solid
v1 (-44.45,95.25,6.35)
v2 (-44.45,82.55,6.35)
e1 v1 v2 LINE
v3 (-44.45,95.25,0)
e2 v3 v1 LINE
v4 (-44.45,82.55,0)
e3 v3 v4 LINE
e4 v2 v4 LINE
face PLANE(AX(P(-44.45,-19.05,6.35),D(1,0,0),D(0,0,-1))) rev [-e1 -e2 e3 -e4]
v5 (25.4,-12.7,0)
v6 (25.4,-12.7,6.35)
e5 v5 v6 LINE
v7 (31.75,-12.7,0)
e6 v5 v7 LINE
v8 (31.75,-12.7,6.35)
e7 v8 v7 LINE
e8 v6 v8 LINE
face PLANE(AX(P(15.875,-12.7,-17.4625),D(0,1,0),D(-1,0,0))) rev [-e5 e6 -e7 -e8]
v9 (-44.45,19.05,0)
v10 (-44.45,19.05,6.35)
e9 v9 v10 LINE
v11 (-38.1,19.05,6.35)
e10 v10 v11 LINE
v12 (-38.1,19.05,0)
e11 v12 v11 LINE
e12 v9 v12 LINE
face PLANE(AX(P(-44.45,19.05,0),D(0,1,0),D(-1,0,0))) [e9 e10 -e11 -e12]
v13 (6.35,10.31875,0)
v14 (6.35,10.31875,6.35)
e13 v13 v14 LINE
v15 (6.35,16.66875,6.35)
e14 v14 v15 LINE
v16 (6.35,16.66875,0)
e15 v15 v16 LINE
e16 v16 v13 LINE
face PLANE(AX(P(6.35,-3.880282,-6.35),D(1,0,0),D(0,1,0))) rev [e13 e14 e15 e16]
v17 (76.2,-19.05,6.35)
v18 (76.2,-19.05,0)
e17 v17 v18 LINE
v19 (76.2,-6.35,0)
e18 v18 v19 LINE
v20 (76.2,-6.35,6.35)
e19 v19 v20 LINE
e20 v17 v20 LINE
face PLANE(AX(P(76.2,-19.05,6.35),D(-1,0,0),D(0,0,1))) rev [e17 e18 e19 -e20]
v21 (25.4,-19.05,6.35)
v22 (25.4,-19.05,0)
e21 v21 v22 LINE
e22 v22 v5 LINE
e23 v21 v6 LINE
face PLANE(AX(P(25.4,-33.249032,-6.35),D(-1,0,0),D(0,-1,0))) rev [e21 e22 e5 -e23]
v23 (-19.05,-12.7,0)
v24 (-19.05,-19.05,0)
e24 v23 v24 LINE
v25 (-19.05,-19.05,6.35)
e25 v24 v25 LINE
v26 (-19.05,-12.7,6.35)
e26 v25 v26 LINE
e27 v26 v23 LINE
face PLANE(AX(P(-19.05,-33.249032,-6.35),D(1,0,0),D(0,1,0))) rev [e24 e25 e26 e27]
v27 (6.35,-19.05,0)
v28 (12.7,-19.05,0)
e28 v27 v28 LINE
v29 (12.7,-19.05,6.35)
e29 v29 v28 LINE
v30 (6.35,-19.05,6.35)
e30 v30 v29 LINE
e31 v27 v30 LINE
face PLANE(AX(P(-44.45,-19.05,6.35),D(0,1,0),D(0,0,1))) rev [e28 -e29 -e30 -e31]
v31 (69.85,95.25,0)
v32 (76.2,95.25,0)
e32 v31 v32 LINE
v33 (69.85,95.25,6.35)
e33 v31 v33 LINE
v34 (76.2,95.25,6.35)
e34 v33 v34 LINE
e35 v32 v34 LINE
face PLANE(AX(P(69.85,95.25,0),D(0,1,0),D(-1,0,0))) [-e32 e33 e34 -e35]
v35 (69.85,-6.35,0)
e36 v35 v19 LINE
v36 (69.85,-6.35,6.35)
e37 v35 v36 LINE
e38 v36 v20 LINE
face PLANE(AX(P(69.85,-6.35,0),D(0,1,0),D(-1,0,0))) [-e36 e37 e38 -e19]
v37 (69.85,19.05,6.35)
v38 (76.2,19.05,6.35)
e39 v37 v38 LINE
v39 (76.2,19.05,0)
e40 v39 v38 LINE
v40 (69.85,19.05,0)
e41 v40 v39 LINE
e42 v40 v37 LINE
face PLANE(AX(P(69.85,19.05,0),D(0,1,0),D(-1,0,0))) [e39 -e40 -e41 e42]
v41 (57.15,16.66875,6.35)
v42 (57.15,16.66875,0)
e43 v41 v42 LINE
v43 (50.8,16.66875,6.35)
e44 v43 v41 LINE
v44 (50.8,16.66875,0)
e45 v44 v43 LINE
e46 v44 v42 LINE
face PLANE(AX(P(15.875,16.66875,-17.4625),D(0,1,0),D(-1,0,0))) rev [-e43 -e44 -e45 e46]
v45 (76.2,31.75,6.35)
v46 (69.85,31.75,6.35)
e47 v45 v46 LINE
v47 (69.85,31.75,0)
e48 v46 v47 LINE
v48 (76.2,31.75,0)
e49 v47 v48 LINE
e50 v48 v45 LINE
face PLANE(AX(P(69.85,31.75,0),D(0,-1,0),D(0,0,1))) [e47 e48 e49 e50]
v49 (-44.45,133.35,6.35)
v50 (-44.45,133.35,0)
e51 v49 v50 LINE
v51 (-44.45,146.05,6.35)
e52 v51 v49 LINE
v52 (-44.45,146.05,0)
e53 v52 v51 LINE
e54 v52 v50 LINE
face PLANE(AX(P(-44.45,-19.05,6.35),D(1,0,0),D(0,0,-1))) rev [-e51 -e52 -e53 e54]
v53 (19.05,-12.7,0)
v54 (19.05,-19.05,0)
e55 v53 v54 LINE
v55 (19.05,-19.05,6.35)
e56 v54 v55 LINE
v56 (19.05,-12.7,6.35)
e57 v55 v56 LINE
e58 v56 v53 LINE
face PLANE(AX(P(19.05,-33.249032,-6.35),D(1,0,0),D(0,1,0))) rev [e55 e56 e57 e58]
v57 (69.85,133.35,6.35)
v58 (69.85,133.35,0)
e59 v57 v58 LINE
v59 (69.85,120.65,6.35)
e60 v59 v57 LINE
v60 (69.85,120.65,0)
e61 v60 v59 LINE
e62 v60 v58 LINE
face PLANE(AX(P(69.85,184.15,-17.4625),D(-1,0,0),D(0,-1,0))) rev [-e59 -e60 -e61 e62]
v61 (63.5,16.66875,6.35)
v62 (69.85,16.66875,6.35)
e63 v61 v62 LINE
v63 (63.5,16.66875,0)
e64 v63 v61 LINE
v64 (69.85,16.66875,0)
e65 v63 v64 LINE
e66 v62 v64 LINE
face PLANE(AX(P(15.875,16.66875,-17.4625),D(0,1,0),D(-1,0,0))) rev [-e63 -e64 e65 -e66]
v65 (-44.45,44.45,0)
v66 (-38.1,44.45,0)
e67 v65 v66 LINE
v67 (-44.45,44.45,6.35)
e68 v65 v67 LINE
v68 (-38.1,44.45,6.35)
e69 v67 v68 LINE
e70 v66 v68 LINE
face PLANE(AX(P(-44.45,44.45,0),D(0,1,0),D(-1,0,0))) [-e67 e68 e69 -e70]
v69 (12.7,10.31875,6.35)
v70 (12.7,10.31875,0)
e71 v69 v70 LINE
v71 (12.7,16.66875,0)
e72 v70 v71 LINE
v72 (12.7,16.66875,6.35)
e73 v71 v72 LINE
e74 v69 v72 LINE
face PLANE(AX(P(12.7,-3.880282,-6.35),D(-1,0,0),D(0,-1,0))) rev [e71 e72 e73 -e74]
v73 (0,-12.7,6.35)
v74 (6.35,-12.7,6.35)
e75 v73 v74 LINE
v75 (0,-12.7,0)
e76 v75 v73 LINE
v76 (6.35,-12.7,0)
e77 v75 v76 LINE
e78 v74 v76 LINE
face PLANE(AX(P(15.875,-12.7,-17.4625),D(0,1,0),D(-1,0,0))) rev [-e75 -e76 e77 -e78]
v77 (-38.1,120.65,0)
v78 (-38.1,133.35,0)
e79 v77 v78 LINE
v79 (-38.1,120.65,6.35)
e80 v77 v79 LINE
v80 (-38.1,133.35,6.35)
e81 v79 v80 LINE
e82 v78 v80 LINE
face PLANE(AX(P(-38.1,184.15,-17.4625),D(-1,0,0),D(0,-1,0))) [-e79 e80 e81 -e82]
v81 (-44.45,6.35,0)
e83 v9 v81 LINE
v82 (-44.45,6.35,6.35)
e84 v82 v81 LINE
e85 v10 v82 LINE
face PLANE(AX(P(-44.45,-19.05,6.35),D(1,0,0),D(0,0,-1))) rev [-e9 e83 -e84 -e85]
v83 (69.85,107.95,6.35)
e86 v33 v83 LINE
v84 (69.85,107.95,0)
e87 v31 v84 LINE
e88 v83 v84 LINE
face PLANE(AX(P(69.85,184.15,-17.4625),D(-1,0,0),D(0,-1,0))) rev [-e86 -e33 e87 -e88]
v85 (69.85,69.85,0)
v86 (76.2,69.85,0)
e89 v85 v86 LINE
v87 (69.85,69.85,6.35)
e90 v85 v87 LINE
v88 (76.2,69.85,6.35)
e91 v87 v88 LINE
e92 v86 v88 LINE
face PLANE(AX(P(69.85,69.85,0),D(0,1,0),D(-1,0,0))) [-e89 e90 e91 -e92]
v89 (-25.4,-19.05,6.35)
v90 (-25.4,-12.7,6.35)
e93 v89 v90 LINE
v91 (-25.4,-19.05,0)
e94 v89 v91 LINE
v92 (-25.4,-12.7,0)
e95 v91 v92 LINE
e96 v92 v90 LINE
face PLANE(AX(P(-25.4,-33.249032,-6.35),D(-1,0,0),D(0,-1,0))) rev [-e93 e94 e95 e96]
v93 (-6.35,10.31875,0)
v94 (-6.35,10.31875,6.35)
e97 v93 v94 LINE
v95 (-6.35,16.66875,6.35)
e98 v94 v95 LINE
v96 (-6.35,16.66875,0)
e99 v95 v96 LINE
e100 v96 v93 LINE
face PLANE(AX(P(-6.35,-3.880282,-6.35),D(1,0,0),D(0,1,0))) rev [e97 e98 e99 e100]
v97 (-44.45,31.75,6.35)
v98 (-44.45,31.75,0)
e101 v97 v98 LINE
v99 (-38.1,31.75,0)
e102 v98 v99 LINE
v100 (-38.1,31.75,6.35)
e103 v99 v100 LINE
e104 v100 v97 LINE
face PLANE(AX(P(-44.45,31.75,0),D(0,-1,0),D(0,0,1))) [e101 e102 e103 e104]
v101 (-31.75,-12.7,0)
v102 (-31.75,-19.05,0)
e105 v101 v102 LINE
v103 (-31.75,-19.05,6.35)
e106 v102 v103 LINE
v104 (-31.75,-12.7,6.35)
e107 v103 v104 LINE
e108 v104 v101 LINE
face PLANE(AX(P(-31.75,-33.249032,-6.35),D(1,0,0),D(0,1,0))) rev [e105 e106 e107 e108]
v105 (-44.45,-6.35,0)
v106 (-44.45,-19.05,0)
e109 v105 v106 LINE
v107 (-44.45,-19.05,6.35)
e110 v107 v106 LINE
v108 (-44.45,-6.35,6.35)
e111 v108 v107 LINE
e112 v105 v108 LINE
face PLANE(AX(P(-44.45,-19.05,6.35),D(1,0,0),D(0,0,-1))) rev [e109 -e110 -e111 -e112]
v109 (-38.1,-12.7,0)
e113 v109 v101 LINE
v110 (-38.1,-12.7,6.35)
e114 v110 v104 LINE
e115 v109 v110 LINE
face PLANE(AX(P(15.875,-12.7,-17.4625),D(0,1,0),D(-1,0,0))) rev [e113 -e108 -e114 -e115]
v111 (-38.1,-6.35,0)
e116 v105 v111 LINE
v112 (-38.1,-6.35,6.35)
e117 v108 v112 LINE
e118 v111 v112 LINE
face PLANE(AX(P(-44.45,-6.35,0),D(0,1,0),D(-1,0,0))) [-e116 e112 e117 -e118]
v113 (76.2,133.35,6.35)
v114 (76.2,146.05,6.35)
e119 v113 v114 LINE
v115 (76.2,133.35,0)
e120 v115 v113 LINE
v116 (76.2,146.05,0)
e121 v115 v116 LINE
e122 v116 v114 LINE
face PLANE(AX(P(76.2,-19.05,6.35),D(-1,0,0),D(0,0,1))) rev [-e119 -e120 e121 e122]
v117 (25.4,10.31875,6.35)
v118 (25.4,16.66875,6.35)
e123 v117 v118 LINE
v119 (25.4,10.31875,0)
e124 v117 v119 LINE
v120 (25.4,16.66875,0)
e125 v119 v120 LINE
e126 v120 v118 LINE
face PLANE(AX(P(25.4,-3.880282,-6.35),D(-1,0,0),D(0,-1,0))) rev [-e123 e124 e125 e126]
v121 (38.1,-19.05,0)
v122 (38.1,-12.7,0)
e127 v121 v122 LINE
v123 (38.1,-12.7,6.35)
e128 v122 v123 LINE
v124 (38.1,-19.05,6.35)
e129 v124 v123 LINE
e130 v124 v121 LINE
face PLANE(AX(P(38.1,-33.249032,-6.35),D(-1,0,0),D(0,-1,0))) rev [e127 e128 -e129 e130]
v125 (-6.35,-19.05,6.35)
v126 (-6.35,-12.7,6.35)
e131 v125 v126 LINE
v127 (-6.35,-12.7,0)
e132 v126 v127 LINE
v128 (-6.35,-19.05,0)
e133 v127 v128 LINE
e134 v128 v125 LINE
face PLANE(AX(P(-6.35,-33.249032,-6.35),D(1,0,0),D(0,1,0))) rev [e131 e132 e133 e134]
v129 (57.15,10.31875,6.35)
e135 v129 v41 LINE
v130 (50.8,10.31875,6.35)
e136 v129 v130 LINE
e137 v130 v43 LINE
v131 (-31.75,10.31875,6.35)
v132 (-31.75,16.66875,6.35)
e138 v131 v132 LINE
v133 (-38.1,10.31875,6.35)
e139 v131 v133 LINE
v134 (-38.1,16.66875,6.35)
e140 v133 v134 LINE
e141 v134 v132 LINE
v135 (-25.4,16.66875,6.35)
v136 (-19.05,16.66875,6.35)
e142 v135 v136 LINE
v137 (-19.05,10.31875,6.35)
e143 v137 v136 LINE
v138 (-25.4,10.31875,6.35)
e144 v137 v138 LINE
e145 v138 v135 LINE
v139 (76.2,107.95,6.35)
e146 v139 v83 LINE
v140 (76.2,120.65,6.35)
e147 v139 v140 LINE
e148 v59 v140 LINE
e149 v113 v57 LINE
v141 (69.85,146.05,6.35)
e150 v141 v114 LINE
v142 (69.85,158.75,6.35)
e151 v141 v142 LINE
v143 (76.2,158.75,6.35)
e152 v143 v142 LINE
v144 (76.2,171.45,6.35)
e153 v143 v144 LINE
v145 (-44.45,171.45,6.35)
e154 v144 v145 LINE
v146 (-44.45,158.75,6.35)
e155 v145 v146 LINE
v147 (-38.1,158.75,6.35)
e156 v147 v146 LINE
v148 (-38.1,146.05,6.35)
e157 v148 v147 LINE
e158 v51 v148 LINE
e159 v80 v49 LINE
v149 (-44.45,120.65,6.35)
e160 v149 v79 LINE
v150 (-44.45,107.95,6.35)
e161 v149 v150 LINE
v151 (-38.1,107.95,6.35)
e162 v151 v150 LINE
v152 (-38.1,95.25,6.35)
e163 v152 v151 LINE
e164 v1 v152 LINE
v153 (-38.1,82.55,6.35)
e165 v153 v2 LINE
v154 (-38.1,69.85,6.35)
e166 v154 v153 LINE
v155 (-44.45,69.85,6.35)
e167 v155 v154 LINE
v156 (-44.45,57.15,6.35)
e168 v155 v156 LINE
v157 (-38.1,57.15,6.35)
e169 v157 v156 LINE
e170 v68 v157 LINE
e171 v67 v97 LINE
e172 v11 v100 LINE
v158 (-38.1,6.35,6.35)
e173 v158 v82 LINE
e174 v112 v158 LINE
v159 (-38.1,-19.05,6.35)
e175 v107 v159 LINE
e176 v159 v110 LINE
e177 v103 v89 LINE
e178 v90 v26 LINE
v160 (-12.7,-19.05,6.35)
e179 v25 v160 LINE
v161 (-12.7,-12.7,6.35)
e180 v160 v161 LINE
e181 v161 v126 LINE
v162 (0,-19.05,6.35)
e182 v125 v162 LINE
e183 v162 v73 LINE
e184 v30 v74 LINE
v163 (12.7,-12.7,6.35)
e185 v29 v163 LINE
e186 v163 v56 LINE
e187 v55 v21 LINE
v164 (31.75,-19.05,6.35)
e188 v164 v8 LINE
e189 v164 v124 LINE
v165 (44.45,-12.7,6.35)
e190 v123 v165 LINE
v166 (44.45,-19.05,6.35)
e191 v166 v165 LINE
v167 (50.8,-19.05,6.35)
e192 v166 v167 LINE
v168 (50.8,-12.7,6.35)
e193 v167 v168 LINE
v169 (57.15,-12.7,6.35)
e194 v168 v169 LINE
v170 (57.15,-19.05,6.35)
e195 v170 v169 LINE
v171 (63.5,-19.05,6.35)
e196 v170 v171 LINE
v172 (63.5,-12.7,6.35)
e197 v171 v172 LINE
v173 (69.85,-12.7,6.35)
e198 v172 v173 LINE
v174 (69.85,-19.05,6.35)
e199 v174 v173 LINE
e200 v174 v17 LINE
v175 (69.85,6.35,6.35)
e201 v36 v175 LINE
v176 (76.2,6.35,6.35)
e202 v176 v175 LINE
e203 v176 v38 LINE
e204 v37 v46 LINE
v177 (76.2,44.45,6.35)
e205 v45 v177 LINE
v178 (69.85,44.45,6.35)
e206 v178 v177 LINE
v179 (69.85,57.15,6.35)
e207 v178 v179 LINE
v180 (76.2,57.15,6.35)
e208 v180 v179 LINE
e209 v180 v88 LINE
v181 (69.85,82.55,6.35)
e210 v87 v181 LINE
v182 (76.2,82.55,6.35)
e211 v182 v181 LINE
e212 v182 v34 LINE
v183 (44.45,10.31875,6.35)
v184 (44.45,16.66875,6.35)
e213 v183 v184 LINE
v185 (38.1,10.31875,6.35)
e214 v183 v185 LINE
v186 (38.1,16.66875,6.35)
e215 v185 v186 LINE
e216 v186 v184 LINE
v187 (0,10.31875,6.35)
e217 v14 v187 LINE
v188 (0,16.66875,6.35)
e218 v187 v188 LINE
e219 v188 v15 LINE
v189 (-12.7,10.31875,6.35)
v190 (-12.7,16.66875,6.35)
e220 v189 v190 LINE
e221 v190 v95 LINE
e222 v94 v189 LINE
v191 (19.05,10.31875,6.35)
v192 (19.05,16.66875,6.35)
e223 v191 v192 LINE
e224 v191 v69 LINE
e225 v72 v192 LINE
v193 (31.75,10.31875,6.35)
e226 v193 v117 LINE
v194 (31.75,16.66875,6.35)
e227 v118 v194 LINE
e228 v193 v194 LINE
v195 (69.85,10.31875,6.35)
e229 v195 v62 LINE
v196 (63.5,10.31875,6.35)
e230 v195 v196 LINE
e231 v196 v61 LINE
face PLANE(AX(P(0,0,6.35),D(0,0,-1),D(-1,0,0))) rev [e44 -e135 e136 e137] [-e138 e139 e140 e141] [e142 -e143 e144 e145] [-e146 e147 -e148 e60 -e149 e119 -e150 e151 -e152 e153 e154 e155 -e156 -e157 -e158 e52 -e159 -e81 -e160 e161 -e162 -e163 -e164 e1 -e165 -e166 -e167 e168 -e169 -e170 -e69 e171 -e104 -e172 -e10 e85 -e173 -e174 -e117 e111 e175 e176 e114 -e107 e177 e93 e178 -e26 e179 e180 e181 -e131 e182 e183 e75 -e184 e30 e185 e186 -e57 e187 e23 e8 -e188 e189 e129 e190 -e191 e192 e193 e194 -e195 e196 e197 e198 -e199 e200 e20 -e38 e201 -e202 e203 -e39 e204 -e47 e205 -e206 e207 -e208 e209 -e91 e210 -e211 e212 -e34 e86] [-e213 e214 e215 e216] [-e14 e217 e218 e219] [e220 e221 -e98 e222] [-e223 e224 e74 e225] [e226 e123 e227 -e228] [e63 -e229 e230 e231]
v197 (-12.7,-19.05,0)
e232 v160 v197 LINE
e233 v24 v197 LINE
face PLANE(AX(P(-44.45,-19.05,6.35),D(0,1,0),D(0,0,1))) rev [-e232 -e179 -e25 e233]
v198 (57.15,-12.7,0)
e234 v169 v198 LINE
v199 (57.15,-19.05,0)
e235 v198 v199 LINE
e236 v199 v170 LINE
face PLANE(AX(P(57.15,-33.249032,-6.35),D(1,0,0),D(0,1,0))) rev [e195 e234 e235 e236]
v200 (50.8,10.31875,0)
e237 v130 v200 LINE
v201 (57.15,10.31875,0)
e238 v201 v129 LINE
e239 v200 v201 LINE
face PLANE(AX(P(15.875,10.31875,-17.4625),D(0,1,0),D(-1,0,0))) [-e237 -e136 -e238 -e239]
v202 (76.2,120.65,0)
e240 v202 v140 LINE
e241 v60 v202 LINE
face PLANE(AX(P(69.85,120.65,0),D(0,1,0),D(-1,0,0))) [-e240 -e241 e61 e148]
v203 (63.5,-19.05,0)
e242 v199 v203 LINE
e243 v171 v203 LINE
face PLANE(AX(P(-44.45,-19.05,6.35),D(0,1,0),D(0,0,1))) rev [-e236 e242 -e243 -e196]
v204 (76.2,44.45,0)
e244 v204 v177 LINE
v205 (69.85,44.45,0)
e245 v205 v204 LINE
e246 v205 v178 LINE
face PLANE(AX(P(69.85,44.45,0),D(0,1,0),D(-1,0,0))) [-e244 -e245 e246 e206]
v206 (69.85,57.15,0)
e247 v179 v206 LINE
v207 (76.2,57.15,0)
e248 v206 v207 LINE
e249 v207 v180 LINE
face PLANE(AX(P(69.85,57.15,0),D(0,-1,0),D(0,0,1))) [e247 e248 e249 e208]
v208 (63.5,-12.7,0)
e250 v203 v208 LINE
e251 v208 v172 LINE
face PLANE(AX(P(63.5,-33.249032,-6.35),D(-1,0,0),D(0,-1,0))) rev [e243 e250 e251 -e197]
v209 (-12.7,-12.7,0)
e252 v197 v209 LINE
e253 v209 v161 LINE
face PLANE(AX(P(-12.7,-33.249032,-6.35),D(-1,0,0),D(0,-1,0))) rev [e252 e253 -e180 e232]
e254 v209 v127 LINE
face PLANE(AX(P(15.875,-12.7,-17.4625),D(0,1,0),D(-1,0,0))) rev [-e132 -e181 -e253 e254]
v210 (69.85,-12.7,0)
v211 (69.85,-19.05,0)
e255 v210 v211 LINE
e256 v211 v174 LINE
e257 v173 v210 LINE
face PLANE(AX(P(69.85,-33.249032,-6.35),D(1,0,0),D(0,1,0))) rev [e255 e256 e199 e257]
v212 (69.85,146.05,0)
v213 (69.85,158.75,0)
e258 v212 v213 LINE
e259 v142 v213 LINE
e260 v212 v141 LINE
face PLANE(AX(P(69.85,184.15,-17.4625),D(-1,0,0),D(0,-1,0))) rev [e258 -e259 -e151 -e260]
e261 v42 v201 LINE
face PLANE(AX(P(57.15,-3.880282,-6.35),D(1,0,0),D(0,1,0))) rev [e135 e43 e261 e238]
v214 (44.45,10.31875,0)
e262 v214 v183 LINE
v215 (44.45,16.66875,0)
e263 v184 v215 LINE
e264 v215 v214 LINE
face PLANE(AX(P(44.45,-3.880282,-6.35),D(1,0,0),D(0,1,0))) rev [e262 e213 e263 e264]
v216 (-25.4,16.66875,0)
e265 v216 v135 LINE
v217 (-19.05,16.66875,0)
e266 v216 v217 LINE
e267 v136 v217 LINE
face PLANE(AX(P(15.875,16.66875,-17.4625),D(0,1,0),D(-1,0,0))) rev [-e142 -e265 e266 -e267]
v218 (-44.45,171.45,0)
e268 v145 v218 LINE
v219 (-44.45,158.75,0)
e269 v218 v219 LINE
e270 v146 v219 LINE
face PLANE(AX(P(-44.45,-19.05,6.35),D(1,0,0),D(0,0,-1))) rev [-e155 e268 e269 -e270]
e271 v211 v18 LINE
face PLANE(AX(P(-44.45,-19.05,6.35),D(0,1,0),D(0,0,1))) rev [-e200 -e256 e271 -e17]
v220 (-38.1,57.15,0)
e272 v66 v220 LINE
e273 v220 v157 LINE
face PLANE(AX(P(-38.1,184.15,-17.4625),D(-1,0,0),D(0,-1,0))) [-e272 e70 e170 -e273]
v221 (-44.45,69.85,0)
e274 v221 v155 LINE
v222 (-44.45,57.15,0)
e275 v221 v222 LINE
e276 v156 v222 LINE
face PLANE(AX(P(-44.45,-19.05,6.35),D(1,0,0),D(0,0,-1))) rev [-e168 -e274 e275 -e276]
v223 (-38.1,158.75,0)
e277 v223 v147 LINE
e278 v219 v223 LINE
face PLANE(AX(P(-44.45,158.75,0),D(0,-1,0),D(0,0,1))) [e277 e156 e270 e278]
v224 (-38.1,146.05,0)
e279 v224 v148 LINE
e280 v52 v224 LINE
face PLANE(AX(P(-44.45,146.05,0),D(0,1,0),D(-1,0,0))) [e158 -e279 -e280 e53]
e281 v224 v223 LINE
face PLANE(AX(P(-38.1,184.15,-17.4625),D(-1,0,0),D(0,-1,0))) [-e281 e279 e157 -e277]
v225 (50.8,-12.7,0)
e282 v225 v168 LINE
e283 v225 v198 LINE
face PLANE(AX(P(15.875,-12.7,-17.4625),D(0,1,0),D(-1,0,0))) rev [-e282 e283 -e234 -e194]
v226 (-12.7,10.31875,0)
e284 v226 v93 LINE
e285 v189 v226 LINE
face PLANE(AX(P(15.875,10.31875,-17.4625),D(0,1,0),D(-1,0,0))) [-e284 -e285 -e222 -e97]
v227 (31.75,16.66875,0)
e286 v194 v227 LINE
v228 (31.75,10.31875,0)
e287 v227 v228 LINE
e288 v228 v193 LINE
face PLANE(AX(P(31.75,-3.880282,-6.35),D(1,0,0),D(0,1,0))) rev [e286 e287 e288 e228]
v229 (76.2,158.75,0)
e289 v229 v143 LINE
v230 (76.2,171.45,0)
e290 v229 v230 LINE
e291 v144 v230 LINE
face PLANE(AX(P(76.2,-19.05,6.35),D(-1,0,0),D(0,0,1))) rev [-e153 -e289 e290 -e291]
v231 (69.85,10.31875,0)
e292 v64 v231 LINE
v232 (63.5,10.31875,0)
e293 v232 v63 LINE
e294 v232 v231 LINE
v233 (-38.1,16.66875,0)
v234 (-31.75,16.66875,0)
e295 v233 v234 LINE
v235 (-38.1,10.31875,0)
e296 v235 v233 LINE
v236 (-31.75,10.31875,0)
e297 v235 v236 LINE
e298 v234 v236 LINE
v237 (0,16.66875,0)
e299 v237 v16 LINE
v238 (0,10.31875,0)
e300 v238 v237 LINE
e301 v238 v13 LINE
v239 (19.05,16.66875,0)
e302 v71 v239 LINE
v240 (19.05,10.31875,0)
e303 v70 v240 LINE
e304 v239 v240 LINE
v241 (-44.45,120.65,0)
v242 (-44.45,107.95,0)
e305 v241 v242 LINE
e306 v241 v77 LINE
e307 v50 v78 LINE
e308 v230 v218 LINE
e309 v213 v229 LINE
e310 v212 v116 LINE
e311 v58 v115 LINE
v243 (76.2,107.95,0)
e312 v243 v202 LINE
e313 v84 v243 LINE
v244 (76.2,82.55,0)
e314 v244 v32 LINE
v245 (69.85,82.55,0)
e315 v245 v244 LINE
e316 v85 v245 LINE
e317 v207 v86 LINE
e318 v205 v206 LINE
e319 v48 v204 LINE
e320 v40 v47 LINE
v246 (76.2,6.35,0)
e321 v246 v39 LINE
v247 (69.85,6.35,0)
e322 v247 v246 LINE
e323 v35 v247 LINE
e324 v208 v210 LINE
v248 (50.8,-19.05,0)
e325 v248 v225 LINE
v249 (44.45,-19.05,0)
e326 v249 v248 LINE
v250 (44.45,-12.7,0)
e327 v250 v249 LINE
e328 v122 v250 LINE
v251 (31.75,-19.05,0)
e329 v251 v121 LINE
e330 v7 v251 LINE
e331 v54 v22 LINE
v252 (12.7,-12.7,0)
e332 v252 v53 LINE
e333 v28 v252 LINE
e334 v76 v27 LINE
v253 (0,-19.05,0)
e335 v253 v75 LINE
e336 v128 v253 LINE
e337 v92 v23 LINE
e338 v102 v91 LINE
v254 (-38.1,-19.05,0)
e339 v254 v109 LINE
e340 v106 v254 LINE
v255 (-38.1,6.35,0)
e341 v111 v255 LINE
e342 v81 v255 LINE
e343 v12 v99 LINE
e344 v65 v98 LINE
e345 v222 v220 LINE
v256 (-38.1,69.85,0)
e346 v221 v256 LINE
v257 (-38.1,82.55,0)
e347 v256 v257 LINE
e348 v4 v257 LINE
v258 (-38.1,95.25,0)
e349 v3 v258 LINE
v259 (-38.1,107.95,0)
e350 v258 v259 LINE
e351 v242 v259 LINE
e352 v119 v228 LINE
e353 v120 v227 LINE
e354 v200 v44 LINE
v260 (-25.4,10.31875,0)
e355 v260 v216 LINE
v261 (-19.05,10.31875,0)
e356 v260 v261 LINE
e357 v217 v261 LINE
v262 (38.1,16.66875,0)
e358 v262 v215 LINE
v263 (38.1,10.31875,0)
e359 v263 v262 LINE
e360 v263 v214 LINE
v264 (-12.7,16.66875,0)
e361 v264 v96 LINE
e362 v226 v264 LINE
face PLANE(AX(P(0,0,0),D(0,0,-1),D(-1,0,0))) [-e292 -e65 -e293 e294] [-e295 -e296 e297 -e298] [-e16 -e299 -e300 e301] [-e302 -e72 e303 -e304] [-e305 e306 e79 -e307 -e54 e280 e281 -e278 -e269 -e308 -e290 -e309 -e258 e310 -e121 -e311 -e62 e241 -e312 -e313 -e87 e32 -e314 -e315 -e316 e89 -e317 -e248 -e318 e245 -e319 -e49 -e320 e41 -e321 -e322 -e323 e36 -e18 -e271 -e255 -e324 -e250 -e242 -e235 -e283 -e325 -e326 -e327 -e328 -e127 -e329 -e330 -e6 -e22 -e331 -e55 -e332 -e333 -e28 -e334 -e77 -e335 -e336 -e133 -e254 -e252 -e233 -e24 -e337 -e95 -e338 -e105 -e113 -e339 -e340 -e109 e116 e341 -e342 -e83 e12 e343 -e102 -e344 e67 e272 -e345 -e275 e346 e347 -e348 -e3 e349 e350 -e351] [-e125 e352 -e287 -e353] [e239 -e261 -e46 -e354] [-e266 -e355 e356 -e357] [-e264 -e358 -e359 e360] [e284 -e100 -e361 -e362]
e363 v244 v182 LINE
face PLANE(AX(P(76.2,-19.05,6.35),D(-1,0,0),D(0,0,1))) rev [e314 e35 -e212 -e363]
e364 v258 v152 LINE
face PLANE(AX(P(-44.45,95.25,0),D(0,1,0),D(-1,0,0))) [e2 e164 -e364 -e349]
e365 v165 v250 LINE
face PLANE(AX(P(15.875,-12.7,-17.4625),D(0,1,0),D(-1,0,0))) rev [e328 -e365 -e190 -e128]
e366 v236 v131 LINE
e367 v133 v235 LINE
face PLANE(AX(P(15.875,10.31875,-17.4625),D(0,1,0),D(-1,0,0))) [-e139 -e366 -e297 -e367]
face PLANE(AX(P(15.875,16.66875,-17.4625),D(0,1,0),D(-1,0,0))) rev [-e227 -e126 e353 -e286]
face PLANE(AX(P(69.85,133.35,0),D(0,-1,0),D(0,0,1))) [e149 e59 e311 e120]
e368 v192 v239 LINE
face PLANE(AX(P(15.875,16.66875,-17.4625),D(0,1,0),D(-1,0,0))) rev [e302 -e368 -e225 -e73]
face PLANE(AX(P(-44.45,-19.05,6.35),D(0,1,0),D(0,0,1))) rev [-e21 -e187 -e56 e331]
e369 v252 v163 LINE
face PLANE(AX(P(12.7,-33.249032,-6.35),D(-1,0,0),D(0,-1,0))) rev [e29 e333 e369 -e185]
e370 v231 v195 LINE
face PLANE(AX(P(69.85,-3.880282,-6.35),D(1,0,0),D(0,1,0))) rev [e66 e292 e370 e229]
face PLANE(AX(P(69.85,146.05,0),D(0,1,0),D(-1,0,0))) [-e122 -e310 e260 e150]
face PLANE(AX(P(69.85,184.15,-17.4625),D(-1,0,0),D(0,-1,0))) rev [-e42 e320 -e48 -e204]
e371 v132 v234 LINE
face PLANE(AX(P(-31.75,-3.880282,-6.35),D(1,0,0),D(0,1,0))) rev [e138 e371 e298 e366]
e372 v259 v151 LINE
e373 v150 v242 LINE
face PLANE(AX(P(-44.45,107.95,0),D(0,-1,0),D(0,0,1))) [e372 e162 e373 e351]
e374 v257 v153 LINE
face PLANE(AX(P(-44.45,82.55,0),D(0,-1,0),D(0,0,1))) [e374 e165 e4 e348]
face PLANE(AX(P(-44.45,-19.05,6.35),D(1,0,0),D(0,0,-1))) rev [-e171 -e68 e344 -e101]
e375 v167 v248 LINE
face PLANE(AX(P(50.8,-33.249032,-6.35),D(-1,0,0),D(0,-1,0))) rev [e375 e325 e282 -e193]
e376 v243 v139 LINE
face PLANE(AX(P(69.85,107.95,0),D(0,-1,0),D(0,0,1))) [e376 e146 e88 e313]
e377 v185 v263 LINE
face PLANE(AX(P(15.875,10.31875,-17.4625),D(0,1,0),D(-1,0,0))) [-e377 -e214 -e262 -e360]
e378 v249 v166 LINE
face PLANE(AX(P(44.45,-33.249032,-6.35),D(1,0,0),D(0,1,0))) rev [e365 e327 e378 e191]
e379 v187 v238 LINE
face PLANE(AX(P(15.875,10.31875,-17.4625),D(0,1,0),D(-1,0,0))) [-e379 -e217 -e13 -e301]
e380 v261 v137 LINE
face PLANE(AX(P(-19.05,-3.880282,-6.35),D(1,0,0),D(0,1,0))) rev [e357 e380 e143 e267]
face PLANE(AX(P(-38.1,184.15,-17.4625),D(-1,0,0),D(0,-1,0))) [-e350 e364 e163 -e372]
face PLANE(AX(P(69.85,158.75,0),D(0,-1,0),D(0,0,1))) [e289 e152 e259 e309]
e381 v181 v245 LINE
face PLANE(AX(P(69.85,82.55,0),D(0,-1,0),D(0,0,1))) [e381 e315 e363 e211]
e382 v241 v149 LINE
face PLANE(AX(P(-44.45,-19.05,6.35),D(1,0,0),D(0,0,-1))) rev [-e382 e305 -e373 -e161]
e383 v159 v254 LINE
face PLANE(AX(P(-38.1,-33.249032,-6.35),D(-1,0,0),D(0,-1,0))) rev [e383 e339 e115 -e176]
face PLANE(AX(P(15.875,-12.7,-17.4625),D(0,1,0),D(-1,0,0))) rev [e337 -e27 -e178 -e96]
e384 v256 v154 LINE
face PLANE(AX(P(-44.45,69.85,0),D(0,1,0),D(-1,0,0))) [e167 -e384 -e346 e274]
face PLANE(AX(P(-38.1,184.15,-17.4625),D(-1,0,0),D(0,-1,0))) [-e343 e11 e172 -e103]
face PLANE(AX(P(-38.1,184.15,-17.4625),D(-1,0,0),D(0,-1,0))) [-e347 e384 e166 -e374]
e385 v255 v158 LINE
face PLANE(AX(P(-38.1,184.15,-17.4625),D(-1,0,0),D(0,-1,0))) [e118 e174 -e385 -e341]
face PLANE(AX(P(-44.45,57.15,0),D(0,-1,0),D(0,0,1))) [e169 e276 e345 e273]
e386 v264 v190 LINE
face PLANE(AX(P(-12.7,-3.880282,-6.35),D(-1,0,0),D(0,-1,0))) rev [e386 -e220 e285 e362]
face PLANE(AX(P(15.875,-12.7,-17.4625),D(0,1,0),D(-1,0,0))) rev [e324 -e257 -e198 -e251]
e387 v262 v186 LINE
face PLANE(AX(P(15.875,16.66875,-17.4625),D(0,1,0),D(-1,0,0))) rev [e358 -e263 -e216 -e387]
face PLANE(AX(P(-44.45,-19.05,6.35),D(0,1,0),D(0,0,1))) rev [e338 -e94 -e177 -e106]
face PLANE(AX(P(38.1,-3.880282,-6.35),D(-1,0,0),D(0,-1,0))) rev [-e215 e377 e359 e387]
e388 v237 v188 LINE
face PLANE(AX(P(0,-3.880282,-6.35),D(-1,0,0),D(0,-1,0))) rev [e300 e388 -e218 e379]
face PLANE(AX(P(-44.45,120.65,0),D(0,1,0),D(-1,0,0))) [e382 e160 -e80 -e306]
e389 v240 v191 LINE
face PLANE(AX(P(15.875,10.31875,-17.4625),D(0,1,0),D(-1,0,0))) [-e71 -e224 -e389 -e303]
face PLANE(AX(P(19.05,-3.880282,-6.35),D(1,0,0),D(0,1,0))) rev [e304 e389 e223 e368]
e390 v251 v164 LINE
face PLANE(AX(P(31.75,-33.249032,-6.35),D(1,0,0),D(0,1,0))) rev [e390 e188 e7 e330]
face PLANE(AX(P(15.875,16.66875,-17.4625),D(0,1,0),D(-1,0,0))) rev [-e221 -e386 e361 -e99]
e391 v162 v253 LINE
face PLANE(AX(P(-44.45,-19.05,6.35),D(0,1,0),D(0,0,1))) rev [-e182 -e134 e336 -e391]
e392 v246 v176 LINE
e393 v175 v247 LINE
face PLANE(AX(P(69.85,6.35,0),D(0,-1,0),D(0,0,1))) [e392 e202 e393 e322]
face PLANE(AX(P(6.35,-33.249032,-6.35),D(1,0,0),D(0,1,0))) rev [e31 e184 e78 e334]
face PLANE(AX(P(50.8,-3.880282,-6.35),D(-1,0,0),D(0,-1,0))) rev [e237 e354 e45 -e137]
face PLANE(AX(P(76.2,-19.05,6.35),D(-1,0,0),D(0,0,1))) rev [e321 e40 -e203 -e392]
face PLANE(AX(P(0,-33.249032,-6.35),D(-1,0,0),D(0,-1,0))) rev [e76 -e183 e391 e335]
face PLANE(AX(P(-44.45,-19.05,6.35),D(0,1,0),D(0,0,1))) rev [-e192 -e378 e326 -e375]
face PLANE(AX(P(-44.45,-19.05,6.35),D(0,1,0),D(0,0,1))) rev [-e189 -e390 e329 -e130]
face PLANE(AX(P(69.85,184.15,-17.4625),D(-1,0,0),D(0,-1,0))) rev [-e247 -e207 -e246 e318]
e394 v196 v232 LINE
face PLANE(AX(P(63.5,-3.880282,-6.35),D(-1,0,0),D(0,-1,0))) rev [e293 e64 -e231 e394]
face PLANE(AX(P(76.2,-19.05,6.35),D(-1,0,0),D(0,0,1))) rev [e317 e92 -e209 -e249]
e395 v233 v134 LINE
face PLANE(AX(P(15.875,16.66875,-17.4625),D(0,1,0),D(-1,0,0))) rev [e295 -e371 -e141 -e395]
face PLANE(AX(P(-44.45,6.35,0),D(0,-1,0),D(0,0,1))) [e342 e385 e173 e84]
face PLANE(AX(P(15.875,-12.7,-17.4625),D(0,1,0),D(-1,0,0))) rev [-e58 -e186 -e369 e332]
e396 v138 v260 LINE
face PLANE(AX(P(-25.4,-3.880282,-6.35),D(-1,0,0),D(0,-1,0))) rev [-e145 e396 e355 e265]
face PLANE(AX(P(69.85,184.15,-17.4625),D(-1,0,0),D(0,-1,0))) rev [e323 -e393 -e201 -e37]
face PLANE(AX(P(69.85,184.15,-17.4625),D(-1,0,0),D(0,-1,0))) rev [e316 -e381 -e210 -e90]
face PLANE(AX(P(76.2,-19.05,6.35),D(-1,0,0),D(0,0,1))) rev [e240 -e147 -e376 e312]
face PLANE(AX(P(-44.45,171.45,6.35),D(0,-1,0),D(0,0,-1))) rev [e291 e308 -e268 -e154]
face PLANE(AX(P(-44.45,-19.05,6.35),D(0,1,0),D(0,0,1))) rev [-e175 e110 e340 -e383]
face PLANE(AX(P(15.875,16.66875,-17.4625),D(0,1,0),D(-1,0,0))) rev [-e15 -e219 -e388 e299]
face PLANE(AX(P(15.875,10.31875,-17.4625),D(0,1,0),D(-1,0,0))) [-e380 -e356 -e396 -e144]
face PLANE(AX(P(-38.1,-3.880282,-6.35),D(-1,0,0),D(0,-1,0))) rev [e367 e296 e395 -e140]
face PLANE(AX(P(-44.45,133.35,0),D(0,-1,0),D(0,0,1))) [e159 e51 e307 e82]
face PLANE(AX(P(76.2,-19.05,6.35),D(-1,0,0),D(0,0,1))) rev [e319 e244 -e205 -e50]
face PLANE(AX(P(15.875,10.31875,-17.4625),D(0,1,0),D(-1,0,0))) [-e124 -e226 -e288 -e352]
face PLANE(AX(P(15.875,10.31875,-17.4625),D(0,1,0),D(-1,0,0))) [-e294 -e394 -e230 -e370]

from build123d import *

# Parameters (mm, degrees)
SKETCH1_W           = 120.65
SKETCH1_H           = 190.5
BOSS_EXTRUDE1_DEPTH = 6.35
CAVITY1_START       = -19.05
CAVITY1_OUTLINE_W   = 6.35
CAVITY1_OUTLINE_H   = 6.35
CAVITY1_DEPTH       = 6.35
CAVITY1_START_2     = 10.31875
CAVITY1_2_OUTLINE_W = 6.35
CAVITY1_2_OUTLINE_H = 6.35
CAVITY1_2_DEPTH     = 6.35
CAVITY1_START_3     = -6.35
CAVITY1_3_OUTLINE_W = 6.35
CAVITY1_3_OUTLINE_H = 6.35
CAVITY1_3_DEPTH     = 12.7
CAVITY1_START_4     = 19.05
CAVITY1_4_OUTLINE_W = 6.35
CAVITY1_4_OUTLINE_H = 6.35
CAVITY1_4_DEPTH     = 12.7
CAVITY1_START_5     = 44.45
CAVITY1_5_OUTLINE_W = 6.35
CAVITY1_5_OUTLINE_H = 6.35
CAVITY1_5_DEPTH     = 12.7
CAVITY1_START_6     = 69.85
CAVITY1_6_OUTLINE_W = 6.35
CAVITY1_6_OUTLINE_H = 6.35
CAVITY1_6_DEPTH     = 12.7
CAVITY1_START_7     = 95.25
CAVITY1_7_OUTLINE_W = 6.35
CAVITY1_7_OUTLINE_H = 6.35
CAVITY1_7_DEPTH     = 12.7
CAVITY1_START_8     = 120.65
CAVITY1_8_OUTLINE_W = 6.35
CAVITY1_8_OUTLINE_H = 6.35
CAVITY1_8_DEPTH     = 12.7
CAVITY1_START_9     = 146.05
CAVITY1_9_OUTLINE_W = 6.35
CAVITY1_9_OUTLINE_H = 6.35
CAVITY1_9_DEPTH     = 12.7


# Read off the part's stored shape, not the designer's step: Cavity1
with BuildPart() as part:
    # Sketch1 → Boss-Extrude1 (new body)
    with BuildSketch(Plane.XY):
        with Locations((15.875, 76.2)):
            Rectangle(SKETCH1_W, SKETCH1_H)
    extrude(amount=BOSS_EXTRUDE1_DEPTH)

    # Cavity1 outline → Cavity1 (cut)
    with BuildSketch(Plane(origin=(0, 0, 0), x_dir=(1, 0, 0), z_dir=(0, 1, 0)).offset(CAVITY1_START)):
        with Locations((66.675, -3.175)):
            Rectangle(CAVITY1_OUTLINE_W, CAVITY1_OUTLINE_H)
        with Locations((53.975, -3.175)):
            Rectangle(CAVITY1_OUTLINE_W, CAVITY1_OUTLINE_H)
        with Locations((41.275, -3.175)):
            Rectangle(CAVITY1_OUTLINE_W, CAVITY1_OUTLINE_H)
        with Locations((28.575, -3.175)):
            Rectangle(CAVITY1_OUTLINE_W, CAVITY1_OUTLINE_H)
        with Locations((15.875, -3.175)):
            Rectangle(CAVITY1_OUTLINE_W, CAVITY1_OUTLINE_H)
        with Locations((3.175, -3.175)):
            Rectangle(CAVITY1_OUTLINE_W, CAVITY1_OUTLINE_H)
        with Locations((-9.525, -3.175)):
            Rectangle(CAVITY1_OUTLINE_W, CAVITY1_OUTLINE_H)
        with Locations((-22.225, -3.175)):
            Rectangle(CAVITY1_OUTLINE_W, CAVITY1_OUTLINE_H)
        with Locations((-34.925, -3.175)):
            Rectangle(CAVITY1_OUTLINE_W, CAVITY1_OUTLINE_H)
    extrude(amount=CAVITY1_DEPTH, mode=Mode.SUBTRACT)

    # Cavity1 2 outline → Cavity1 2 (cut)
    with BuildSketch(Plane(origin=(0, 0, 0), x_dir=(1, 0, 0), z_dir=(0, 1, 0)).offset(CAVITY1_START_2)):
        with Locations((66.675, -3.175)):
            Rectangle(CAVITY1_2_OUTLINE_W, CAVITY1_2_OUTLINE_H)
        with Locations((53.975, -3.175)):
            Rectangle(CAVITY1_2_OUTLINE_W, CAVITY1_2_OUTLINE_H)
        with Locations((41.275, -3.175)):
            Rectangle(CAVITY1_2_OUTLINE_W, CAVITY1_2_OUTLINE_H)
        with Locations((28.575, -3.175)):
            Rectangle(CAVITY1_2_OUTLINE_W, CAVITY1_2_OUTLINE_H)
        with Locations((15.875, -3.175)):
            Rectangle(CAVITY1_2_OUTLINE_W, CAVITY1_2_OUTLINE_H)
        with Locations((3.175, -3.175)):
            Rectangle(CAVITY1_2_OUTLINE_W, CAVITY1_2_OUTLINE_H)
        with Locations((-9.525, -3.175)):
            Rectangle(CAVITY1_2_OUTLINE_W, CAVITY1_2_OUTLINE_H)
        with Locations((-22.225, -3.175)):
            Rectangle(CAVITY1_2_OUTLINE_W, CAVITY1_2_OUTLINE_H)
        with Locations((-34.925, -3.175)):
            Rectangle(CAVITY1_2_OUTLINE_W, CAVITY1_2_OUTLINE_H)
    extrude(amount=CAVITY1_2_DEPTH, mode=Mode.SUBTRACT)

    # Cavity1 3 outline → Cavity1 3 (cut)
    with BuildSketch(Plane(origin=(0, 0, 0), x_dir=(1, 0, 0), z_dir=(0, 1, 0)).offset(CAVITY1_START_3)):
        with Locations((73.025, -3.175)):
            Rectangle(CAVITY1_3_OUTLINE_W, CAVITY1_3_OUTLINE_H)
        with Locations((-41.275, -3.175)):
            Rectangle(CAVITY1_3_OUTLINE_W, CAVITY1_3_OUTLINE_H)
    extrude(amount=CAVITY1_3_DEPTH, mode=Mode.SUBTRACT)

    # Cavity1 4 outline → Cavity1 4 (cut)
    with BuildSketch(Plane(origin=(0, 0, 0), x_dir=(1, 0, 0), z_dir=(0, 1, 0)).offset(CAVITY1_START_4)):
        with Locations((73.025, -3.175)):
            Rectangle(CAVITY1_4_OUTLINE_W, CAVITY1_4_OUTLINE_H)
        with Locations((-41.275, -3.175)):
            Rectangle(CAVITY1_4_OUTLINE_W, CAVITY1_4_OUTLINE_H)
    extrude(amount=CAVITY1_4_DEPTH, mode=Mode.SUBTRACT)

    # Cavity1 5 outline → Cavity1 5 (cut)
    with BuildSketch(Plane(origin=(0, 0, 0), x_dir=(1, 0, 0), z_dir=(0, 1, 0)).offset(CAVITY1_START_5)):
        with Locations((73.025, -3.175)):
            Rectangle(CAVITY1_5_OUTLINE_W, CAVITY1_5_OUTLINE_H)
        with Locations((-41.275, -3.175)):
            Rectangle(CAVITY1_5_OUTLINE_W, CAVITY1_5_OUTLINE_H)
    extrude(amount=CAVITY1_5_DEPTH, mode=Mode.SUBTRACT)

    # Cavity1 6 outline → Cavity1 6 (cut)
    with BuildSketch(Plane(origin=(0, 0, 0), x_dir=(1, 0, 0), z_dir=(0, 1, 0)).offset(CAVITY1_START_6)):
        with Locations((73.025, -3.175)):
            Rectangle(CAVITY1_6_OUTLINE_W, CAVITY1_6_OUTLINE_H)
        with Locations((-41.275, -3.175)):
            Rectangle(CAVITY1_6_OUTLINE_W, CAVITY1_6_OUTLINE_H)
    extrude(amount=CAVITY1_6_DEPTH, mode=Mode.SUBTRACT)

    # Cavity1 7 outline → Cavity1 7 (cut)
    with BuildSketch(Plane(origin=(0, 0, 0), x_dir=(1, 0, 0), z_dir=(0, 1, 0)).offset(CAVITY1_START_7)):
        with Locations((73.025, -3.175)):
            Rectangle(CAVITY1_7_OUTLINE_W, CAVITY1_7_OUTLINE_H)
        with Locations((-41.275, -3.175)):
            Rectangle(CAVITY1_7_OUTLINE_W, CAVITY1_7_OUTLINE_H)
    extrude(amount=CAVITY1_7_DEPTH, mode=Mode.SUBTRACT)

    # Cavity1 8 outline → Cavity1 8 (cut)
    with BuildSketch(Plane(origin=(0, 0, 0), x_dir=(1, 0, 0), z_dir=(0, 1, 0)).offset(CAVITY1_START_8)):
        with Locations((73.025, -3.175)):
            Rectangle(CAVITY1_8_OUTLINE_W, CAVITY1_8_OUTLINE_H)
        with Locations((-41.275, -3.175)):
            Rectangle(CAVITY1_8_OUTLINE_W, CAVITY1_8_OUTLINE_H)
    extrude(amount=CAVITY1_8_DEPTH, mode=Mode.SUBTRACT)

    # Cavity1 9 outline → Cavity1 9 (cut)
    with BuildSketch(Plane(origin=(0, 0, 0), x_dir=(1, 0, 0), z_dir=(0, 1, 0)).offset(CAVITY1_START_9)):
        with Locations((73.025, -3.175)):
            Rectangle(CAVITY1_9_OUTLINE_W, CAVITY1_9_OUTLINE_H)
        with Locations((-41.275, -3.175)):
            Rectangle(CAVITY1_9_OUTLINE_W, CAVITY1_9_OUTLINE_H)
    extrude(amount=CAVITY1_9_DEPTH, mode=Mode.SUBTRACT)


solid = part.part
